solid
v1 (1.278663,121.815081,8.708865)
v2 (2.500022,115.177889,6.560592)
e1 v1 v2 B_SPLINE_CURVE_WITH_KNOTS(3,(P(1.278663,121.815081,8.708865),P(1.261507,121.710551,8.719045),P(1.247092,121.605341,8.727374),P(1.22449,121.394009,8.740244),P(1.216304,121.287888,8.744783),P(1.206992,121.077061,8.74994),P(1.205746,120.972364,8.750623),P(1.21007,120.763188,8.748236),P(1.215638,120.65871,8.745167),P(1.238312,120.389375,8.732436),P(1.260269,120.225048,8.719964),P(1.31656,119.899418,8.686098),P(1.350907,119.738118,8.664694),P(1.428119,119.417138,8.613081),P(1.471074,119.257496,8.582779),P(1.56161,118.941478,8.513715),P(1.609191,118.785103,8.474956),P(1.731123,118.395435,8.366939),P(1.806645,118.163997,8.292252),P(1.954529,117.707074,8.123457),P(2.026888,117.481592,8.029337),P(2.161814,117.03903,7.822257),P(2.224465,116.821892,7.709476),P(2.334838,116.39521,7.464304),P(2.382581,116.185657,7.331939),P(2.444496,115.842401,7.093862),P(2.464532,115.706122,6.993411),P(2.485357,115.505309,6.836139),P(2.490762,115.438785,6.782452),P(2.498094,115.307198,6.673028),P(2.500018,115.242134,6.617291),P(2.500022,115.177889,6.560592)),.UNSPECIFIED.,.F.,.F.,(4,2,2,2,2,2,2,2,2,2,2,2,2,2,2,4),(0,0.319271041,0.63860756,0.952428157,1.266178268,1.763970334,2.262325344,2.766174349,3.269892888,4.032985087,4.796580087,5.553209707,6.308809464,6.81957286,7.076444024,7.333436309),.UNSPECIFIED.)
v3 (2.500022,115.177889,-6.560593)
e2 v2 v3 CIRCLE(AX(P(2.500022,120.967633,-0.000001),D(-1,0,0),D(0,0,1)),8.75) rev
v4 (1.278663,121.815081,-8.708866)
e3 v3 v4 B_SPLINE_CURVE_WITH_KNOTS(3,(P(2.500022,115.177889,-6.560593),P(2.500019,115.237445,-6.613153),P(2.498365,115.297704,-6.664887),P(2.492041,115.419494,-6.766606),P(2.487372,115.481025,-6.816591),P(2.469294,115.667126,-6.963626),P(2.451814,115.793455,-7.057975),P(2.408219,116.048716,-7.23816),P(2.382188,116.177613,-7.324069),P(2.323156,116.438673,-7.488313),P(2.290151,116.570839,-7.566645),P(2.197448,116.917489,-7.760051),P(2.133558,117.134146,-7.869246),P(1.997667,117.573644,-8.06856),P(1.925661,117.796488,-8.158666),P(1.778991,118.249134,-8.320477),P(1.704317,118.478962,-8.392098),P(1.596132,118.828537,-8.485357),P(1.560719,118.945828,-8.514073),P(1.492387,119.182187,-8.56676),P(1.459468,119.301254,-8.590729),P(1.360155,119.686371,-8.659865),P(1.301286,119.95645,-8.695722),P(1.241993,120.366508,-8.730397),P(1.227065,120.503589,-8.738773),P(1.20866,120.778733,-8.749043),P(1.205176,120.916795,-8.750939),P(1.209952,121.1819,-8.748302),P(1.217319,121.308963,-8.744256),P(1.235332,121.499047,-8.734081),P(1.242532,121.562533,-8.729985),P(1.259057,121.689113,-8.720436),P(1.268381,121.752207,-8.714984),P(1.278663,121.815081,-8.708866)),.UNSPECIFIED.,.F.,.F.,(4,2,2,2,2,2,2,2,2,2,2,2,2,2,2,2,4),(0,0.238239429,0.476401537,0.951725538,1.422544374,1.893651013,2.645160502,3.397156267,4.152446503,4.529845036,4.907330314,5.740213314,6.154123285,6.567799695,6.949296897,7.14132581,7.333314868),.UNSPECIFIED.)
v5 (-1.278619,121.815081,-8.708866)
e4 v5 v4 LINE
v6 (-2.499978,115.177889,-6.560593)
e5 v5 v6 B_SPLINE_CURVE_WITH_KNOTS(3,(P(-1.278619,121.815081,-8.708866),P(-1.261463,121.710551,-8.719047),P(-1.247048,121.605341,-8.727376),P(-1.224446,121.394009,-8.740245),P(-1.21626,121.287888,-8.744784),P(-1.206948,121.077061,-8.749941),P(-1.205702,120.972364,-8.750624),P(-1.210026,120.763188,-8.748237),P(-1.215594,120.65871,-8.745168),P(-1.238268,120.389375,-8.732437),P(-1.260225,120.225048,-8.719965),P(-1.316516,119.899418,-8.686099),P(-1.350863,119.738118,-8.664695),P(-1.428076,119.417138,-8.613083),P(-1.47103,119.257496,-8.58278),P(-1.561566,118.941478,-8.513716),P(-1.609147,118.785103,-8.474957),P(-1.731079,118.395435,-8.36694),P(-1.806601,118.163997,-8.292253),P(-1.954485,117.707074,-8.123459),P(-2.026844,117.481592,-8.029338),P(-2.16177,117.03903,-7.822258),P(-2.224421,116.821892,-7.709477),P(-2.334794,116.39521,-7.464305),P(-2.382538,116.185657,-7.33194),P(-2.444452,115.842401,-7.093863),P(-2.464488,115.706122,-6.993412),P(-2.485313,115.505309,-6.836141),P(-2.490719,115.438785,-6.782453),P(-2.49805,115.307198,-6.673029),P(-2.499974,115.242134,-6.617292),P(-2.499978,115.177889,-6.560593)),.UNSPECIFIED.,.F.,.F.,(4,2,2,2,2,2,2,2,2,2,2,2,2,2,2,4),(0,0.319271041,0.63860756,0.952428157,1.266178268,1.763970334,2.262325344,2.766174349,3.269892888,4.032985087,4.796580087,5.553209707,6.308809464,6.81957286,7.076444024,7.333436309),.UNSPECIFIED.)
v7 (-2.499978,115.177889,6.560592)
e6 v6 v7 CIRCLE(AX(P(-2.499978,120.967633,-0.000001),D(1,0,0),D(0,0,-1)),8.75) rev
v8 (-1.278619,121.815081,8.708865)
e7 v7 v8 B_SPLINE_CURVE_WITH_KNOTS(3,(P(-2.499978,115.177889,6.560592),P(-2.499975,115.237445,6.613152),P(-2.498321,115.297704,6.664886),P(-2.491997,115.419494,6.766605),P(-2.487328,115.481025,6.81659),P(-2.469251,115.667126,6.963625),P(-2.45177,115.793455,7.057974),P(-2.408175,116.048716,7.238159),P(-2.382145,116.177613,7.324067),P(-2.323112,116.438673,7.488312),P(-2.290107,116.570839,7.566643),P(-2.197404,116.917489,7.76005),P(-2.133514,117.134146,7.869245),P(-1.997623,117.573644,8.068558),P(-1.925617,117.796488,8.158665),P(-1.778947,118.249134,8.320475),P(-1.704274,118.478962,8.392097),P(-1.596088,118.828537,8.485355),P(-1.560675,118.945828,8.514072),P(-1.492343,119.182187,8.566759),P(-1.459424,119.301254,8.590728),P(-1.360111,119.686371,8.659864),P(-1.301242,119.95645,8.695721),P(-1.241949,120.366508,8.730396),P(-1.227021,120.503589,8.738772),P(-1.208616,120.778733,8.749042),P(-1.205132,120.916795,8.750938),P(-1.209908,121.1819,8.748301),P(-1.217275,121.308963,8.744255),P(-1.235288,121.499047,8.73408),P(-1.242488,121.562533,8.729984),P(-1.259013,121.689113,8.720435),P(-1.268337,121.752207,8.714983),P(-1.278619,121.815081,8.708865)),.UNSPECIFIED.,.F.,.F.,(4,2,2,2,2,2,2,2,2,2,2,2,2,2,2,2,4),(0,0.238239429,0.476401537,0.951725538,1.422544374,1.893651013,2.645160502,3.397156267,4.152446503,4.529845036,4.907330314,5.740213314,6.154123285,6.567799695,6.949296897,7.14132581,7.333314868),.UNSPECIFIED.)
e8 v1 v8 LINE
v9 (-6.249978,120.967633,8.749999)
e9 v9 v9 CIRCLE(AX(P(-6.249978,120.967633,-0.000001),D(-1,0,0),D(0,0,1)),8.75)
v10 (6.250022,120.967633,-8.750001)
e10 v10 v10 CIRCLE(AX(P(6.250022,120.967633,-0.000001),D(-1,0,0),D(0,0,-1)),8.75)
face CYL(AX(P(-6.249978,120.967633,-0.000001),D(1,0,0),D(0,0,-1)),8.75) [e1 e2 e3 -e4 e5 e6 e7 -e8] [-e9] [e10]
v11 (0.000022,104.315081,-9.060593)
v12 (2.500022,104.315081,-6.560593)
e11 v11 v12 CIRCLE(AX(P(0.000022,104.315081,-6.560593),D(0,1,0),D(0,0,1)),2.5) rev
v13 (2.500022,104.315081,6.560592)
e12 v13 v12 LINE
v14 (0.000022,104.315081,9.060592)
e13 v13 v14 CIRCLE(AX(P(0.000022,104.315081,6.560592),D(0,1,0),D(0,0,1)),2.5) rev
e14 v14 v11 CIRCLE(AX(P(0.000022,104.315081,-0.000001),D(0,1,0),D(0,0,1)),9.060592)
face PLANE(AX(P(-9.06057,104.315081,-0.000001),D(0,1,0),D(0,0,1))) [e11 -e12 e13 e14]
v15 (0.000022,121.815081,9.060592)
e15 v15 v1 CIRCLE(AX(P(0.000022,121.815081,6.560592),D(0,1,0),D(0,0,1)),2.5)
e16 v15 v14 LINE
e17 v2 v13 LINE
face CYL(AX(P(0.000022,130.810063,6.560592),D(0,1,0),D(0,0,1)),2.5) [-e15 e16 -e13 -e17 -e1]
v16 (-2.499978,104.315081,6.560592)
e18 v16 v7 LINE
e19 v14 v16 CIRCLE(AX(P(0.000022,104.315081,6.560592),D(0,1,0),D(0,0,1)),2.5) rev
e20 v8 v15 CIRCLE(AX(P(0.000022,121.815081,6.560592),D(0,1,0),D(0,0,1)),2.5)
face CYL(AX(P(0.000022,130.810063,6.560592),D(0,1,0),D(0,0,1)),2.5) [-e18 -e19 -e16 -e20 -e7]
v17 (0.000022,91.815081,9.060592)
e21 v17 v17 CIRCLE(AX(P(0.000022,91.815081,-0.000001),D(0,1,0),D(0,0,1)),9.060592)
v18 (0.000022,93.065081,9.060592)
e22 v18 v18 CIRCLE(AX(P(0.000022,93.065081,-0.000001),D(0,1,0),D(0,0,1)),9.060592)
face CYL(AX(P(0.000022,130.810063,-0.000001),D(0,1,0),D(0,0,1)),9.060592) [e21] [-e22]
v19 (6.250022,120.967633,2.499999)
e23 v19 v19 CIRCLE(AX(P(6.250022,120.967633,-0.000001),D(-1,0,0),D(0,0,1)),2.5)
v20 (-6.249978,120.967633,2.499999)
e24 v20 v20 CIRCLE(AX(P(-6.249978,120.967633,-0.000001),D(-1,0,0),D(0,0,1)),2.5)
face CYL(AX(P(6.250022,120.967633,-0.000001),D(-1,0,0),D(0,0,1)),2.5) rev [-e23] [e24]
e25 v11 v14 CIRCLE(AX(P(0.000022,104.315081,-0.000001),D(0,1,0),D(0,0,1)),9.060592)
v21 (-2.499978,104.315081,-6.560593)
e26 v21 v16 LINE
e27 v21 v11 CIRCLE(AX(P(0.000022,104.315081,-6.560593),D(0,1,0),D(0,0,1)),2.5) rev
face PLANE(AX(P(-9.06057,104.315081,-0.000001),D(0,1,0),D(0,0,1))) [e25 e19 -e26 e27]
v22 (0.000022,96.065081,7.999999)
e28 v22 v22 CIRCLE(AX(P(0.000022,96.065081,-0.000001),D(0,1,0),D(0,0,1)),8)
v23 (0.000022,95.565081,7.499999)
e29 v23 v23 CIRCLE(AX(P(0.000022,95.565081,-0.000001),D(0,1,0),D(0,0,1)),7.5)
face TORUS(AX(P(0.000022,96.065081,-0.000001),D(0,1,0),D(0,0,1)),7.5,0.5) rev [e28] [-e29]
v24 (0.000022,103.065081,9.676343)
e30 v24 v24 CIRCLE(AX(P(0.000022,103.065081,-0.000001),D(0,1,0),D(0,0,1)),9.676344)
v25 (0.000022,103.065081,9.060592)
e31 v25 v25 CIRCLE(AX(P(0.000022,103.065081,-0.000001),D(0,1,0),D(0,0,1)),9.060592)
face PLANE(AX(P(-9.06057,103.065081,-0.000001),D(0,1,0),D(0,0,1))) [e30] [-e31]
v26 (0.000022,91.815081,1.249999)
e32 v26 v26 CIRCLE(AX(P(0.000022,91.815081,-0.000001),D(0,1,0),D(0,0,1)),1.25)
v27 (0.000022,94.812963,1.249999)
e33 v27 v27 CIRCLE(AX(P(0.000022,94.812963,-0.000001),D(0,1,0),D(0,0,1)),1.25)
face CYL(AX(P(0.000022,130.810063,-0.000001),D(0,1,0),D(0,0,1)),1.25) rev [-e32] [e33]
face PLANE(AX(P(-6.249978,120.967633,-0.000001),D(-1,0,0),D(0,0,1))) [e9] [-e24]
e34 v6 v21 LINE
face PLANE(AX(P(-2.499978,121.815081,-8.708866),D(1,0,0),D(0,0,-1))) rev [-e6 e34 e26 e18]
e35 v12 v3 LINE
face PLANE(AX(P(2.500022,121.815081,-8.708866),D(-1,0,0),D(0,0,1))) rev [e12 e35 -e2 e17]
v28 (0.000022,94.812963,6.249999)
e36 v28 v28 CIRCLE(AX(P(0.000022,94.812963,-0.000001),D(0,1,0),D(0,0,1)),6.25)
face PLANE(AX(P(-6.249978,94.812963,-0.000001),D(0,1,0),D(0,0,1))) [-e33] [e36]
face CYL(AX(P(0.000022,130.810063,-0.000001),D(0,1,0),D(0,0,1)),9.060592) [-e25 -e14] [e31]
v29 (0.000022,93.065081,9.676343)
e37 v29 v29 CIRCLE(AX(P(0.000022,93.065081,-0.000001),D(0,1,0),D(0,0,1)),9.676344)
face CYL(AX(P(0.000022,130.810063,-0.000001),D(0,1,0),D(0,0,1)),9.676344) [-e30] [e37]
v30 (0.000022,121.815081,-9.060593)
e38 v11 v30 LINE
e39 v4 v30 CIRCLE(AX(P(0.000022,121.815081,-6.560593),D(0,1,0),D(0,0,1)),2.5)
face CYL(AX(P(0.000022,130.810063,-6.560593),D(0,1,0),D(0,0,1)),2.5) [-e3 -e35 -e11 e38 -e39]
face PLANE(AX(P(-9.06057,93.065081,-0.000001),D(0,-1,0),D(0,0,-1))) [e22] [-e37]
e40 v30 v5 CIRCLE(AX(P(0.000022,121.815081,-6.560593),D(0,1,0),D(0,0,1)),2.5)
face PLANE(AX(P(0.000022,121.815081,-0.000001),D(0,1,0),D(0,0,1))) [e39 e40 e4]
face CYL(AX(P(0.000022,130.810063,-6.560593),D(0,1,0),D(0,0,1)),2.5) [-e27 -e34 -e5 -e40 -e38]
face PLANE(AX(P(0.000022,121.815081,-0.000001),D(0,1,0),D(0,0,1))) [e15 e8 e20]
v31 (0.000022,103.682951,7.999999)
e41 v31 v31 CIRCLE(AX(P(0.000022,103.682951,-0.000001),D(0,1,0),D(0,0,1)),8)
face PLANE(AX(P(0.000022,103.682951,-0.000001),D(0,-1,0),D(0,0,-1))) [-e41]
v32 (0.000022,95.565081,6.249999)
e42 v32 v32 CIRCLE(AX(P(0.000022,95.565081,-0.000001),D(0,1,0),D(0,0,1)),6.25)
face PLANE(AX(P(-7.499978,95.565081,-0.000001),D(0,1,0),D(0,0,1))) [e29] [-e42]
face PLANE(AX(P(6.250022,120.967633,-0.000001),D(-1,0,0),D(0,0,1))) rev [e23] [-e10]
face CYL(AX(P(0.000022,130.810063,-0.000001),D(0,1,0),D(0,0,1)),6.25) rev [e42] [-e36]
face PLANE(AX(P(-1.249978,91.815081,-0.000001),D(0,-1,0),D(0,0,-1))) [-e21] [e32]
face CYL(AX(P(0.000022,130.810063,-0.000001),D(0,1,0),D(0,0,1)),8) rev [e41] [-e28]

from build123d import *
from build123d.topology import SkipClean

# Parameters (mm, degrees)
BOSS_EXTRU_1_START      = 70
BOSS_EXTRU_1_DEPTH      = 70
BOSS_EXTRU_2_DEPTH      = 25
ESQUISSE7_R             = 10
ENL_V_MAT_EXTRU_1_DEPTH = 50
CONG_3_R                = 10
ECHELLE1_SCALE          = 0.25


with BuildPart() as part:
    # Esquisse1 → Révolution1 (revolve)
    with BuildSketch(Plane.XY, mode=Mode.PRIVATE) as r_volution1_sk:
        with BuildLine():
            Line((-5, 34.242293075), (-36.242368939, 34.242293075))
            Line((-36.242368939, 34.242293075), (-36.242368939, 39.242293075))
            Line((-36.242368939, 39.242293075), (-38.705375435, 39.242293075))
            Line((-38.705375435, 39.242293075), (-38.705375435, 79.242293075))
            Line((-38.705375435, 79.242293075), (-36.242368939, 79.242293075))
            Line((-36.242368939, 79.242293075), (-36.242368939, 84.242293075))
            Line((-36.242368939, 84.242293075), (-32, 84.242293075))
            Line((-32, 84.242293075), (0, 84.242293075))
            Line((0, 84.242293075), (0, 81.713773078))
            Line((0, 81.713773078), (-32, 81.713773078))
            Line((-32, 81.713773078), (-32, 51.242293075))
            ThreePointArc((-32, 51.242293075), (-31.414213562, 49.828079513), (-30, 49.242293075))
            Line((-30, 49.242293075), (-25, 49.242293075))
            Line((-25, 49.242293075), (-25, 46.233820065))
            Line((-25, 46.233820065), (-5, 46.233820065))
            Line((-5, 46.233820065), (-5, 34.242293075))
        make_face()
    revolve(r_volution1_sk.sketch.rotate(Axis((0, 190.222222222, 0), (0, -1, 0)), 270), axis=Axis((0, 190.222222222, 0), (0, -1, 0)))

    # Esquisse2 → Boss.-Extru.1 (add)
    with SkipClean():  # the faces are left unmerged after this step: merging them gives an invalid solid
        with BuildSketch(Plane(origin=(0, 84.242293075, 0), x_dir=(1, 0, 0), z_dir=(0, 1, 0)).offset(BOSS_EXTRU_1_START)):
            with BuildLine():
                Line((-10, 34.835460472), (-10, -34.835460472))
                ThreePointArc((-10, -34.835460472), (0, -36.242368939), (10, -34.835460472))
                Line((10, -34.835460472), (10, 34.835460472))
                ThreePointArc((10, 34.835460472), (0, 36.242368939), (-10, 34.835460472))
            make_face()
        extrude(amount=-BOSS_EXTRU_1_DEPTH)

    # Esquisse6 → Boss.-Extru.2 (add, symmetric)
    with SkipClean():  # the faces are left unmerged after this step: merging them gives an invalid solid
        with BuildSketch(Plane.ZY):
            with BuildLine():
                ThreePointArc((-34.835460472, 154.242293075), (0, 185.852500498), (34.835460472, 154.242293075))
                ThreePointArc((34.835460472, 154.242293075), (0, 115.852500498), (-34.835460472, 154.242293075))
            make_face()
        extrude(amount=BOSS_EXTRU_2_DEPTH, both=True)

    # Esquisse7 → Enlèv. mat.-Extru.1 (cut)
    with SkipClean():  # the faces are left unmerged after this step: merging them gives an invalid solid
        with BuildSketch(Plane.ZY.offset(25)):
            with Locations((0, 150.852500498)):
                Circle(ESQUISSE7_R)
        extrude(amount=-ENL_V_MAT_EXTRU_1_DEPTH, mode=Mode.SUBTRACT)

    # Congé3
    # the kernel refuses this fillet: 10 mm, written as the material it takes off along each edge
    with BuildSketch(Plane(origin=(10, 172.708919448, 34.835460472), x_dir=(-0.9902475852004595, 0, 0.1393187711855749), z_dir=(0, -1, 0))) as cong_3_piece_1_section:
        with BuildLine():
            CenterArc((8.705296899, 9.902475852), CONG_3_R, 188.0084284, 90)
            Line((-1.197178953, 8.50928814), (0, 0))
            ThreePointArc((0, 0), (5.049242305, -0.353450615), (10.098484611, 0))
        make_face()
    cong_3_piece_1 = extrude(amount=88.466626373, mode=Mode.PRIVATE)
    cong_3_piece_1 = cong_3_piece_1 - Plane(origin=(7.456754733, 150.852500498, 0), x_dir=(0, 0.09685121648897653, -0.9952988706235959), z_dir=(-1, 0, 0)) * Cylinder(35, 218, mode=Mode.PRIVATE)
    add(cong_3_piece_1, mode=Mode.SUBTRACT)
    with BuildSketch(Plane(origin=(10, 172.708919448, -34.835460472), x_dir=(-0.9902475852004589, 0, -0.13931877118558042), z_dir=(0, -1, 0))) as cong_3_piece_2_section:
        with BuildLine():
            CenterArc((8.705296899, -9.902475852), CONG_3_R, 81.9915716, 90)
            Line((-1.197178953, -8.50928814), (0, 0))
            ThreePointArc((0, 0), (5.049242305, 0.353450615), (10.098484611, 0))
        make_face()
    cong_3_piece_2 = extrude(amount=88.466626373, mode=Mode.PRIVATE)
    cong_3_piece_2 = cong_3_piece_2 - Plane(origin=(7.456771832, 150.852500498, 0), x_dir=(0, 0.09685121648897653, -0.9952988706235959), z_dir=(-1, 0, 0)) * Cylinder(35, 218, mode=Mode.PRIVATE)
    add(cong_3_piece_2, mode=Mode.SUBTRACT)
    with BuildSketch(Plane(origin=(-10, 172.708919448, -34.835460472), x_dir=(0.990247585200459, 0, -0.13931877118557906), z_dir=(0, -1, 0))) as cong_3_piece_3_section:
        with BuildLine():
            CenterArc((8.705296899, 9.902475852), CONG_3_R, 188.0084284, 90)
            Line((-1.197178953, 8.50928814), (0, 0))
            ThreePointArc((0, 0), (5.049242305, -0.353450615), (10.098484611, 0))
        make_face()
    cong_3_piece_3 = extrude(amount=88.466626373, mode=Mode.PRIVATE)
    cong_3_piece_3 = cong_3_piece_3 - Plane(origin=(-7.456771832, 150.852500498, 0), x_dir=(0, 0.09685121648897653, -0.9952988706235959), z_dir=(-1, 0, 0)) * Cylinder(35, 218, mode=Mode.PRIVATE)
    add(cong_3_piece_3, mode=Mode.SUBTRACT)
    with BuildSketch(Plane(origin=(-10, 172.708919448, 34.835460472), x_dir=(0.9902475852004595, 0, 0.1393187711855749), z_dir=(0, -1, 0))) as cong_3_piece_4_section:
        with BuildLine():
            CenterArc((8.705296899, -9.902475852), CONG_3_R, 81.9915716, 90)
            Line((-1.197178953, -8.50928814), (0, 0))
            ThreePointArc((0, 0), (5.049242305, 0.353450615), (10.098484611, 0))
        make_face()
    cong_3_piece_4 = extrude(amount=88.466626373, mode=Mode.PRIVATE)
    cong_3_piece_4 = cong_3_piece_4 - Plane(origin=(-7.456754733, 150.852500498, 0), x_dir=(0, 0.09685121648897653, -0.9952988706235959), z_dir=(-1, 0, 0)) * Cylinder(35, 218, mode=Mode.PRIVATE)
    add(cong_3_piece_4, mode=Mode.SUBTRACT)


with BuildPart() as part_1:
    # Echelle1: scaled about (0, 111.005849146, 2.25e-07)
    add(part.part.scale(ECHELLE1_SCALE).moved(Location((0, 83.25438686, 1.69e-07))))


solid = part_1.part
